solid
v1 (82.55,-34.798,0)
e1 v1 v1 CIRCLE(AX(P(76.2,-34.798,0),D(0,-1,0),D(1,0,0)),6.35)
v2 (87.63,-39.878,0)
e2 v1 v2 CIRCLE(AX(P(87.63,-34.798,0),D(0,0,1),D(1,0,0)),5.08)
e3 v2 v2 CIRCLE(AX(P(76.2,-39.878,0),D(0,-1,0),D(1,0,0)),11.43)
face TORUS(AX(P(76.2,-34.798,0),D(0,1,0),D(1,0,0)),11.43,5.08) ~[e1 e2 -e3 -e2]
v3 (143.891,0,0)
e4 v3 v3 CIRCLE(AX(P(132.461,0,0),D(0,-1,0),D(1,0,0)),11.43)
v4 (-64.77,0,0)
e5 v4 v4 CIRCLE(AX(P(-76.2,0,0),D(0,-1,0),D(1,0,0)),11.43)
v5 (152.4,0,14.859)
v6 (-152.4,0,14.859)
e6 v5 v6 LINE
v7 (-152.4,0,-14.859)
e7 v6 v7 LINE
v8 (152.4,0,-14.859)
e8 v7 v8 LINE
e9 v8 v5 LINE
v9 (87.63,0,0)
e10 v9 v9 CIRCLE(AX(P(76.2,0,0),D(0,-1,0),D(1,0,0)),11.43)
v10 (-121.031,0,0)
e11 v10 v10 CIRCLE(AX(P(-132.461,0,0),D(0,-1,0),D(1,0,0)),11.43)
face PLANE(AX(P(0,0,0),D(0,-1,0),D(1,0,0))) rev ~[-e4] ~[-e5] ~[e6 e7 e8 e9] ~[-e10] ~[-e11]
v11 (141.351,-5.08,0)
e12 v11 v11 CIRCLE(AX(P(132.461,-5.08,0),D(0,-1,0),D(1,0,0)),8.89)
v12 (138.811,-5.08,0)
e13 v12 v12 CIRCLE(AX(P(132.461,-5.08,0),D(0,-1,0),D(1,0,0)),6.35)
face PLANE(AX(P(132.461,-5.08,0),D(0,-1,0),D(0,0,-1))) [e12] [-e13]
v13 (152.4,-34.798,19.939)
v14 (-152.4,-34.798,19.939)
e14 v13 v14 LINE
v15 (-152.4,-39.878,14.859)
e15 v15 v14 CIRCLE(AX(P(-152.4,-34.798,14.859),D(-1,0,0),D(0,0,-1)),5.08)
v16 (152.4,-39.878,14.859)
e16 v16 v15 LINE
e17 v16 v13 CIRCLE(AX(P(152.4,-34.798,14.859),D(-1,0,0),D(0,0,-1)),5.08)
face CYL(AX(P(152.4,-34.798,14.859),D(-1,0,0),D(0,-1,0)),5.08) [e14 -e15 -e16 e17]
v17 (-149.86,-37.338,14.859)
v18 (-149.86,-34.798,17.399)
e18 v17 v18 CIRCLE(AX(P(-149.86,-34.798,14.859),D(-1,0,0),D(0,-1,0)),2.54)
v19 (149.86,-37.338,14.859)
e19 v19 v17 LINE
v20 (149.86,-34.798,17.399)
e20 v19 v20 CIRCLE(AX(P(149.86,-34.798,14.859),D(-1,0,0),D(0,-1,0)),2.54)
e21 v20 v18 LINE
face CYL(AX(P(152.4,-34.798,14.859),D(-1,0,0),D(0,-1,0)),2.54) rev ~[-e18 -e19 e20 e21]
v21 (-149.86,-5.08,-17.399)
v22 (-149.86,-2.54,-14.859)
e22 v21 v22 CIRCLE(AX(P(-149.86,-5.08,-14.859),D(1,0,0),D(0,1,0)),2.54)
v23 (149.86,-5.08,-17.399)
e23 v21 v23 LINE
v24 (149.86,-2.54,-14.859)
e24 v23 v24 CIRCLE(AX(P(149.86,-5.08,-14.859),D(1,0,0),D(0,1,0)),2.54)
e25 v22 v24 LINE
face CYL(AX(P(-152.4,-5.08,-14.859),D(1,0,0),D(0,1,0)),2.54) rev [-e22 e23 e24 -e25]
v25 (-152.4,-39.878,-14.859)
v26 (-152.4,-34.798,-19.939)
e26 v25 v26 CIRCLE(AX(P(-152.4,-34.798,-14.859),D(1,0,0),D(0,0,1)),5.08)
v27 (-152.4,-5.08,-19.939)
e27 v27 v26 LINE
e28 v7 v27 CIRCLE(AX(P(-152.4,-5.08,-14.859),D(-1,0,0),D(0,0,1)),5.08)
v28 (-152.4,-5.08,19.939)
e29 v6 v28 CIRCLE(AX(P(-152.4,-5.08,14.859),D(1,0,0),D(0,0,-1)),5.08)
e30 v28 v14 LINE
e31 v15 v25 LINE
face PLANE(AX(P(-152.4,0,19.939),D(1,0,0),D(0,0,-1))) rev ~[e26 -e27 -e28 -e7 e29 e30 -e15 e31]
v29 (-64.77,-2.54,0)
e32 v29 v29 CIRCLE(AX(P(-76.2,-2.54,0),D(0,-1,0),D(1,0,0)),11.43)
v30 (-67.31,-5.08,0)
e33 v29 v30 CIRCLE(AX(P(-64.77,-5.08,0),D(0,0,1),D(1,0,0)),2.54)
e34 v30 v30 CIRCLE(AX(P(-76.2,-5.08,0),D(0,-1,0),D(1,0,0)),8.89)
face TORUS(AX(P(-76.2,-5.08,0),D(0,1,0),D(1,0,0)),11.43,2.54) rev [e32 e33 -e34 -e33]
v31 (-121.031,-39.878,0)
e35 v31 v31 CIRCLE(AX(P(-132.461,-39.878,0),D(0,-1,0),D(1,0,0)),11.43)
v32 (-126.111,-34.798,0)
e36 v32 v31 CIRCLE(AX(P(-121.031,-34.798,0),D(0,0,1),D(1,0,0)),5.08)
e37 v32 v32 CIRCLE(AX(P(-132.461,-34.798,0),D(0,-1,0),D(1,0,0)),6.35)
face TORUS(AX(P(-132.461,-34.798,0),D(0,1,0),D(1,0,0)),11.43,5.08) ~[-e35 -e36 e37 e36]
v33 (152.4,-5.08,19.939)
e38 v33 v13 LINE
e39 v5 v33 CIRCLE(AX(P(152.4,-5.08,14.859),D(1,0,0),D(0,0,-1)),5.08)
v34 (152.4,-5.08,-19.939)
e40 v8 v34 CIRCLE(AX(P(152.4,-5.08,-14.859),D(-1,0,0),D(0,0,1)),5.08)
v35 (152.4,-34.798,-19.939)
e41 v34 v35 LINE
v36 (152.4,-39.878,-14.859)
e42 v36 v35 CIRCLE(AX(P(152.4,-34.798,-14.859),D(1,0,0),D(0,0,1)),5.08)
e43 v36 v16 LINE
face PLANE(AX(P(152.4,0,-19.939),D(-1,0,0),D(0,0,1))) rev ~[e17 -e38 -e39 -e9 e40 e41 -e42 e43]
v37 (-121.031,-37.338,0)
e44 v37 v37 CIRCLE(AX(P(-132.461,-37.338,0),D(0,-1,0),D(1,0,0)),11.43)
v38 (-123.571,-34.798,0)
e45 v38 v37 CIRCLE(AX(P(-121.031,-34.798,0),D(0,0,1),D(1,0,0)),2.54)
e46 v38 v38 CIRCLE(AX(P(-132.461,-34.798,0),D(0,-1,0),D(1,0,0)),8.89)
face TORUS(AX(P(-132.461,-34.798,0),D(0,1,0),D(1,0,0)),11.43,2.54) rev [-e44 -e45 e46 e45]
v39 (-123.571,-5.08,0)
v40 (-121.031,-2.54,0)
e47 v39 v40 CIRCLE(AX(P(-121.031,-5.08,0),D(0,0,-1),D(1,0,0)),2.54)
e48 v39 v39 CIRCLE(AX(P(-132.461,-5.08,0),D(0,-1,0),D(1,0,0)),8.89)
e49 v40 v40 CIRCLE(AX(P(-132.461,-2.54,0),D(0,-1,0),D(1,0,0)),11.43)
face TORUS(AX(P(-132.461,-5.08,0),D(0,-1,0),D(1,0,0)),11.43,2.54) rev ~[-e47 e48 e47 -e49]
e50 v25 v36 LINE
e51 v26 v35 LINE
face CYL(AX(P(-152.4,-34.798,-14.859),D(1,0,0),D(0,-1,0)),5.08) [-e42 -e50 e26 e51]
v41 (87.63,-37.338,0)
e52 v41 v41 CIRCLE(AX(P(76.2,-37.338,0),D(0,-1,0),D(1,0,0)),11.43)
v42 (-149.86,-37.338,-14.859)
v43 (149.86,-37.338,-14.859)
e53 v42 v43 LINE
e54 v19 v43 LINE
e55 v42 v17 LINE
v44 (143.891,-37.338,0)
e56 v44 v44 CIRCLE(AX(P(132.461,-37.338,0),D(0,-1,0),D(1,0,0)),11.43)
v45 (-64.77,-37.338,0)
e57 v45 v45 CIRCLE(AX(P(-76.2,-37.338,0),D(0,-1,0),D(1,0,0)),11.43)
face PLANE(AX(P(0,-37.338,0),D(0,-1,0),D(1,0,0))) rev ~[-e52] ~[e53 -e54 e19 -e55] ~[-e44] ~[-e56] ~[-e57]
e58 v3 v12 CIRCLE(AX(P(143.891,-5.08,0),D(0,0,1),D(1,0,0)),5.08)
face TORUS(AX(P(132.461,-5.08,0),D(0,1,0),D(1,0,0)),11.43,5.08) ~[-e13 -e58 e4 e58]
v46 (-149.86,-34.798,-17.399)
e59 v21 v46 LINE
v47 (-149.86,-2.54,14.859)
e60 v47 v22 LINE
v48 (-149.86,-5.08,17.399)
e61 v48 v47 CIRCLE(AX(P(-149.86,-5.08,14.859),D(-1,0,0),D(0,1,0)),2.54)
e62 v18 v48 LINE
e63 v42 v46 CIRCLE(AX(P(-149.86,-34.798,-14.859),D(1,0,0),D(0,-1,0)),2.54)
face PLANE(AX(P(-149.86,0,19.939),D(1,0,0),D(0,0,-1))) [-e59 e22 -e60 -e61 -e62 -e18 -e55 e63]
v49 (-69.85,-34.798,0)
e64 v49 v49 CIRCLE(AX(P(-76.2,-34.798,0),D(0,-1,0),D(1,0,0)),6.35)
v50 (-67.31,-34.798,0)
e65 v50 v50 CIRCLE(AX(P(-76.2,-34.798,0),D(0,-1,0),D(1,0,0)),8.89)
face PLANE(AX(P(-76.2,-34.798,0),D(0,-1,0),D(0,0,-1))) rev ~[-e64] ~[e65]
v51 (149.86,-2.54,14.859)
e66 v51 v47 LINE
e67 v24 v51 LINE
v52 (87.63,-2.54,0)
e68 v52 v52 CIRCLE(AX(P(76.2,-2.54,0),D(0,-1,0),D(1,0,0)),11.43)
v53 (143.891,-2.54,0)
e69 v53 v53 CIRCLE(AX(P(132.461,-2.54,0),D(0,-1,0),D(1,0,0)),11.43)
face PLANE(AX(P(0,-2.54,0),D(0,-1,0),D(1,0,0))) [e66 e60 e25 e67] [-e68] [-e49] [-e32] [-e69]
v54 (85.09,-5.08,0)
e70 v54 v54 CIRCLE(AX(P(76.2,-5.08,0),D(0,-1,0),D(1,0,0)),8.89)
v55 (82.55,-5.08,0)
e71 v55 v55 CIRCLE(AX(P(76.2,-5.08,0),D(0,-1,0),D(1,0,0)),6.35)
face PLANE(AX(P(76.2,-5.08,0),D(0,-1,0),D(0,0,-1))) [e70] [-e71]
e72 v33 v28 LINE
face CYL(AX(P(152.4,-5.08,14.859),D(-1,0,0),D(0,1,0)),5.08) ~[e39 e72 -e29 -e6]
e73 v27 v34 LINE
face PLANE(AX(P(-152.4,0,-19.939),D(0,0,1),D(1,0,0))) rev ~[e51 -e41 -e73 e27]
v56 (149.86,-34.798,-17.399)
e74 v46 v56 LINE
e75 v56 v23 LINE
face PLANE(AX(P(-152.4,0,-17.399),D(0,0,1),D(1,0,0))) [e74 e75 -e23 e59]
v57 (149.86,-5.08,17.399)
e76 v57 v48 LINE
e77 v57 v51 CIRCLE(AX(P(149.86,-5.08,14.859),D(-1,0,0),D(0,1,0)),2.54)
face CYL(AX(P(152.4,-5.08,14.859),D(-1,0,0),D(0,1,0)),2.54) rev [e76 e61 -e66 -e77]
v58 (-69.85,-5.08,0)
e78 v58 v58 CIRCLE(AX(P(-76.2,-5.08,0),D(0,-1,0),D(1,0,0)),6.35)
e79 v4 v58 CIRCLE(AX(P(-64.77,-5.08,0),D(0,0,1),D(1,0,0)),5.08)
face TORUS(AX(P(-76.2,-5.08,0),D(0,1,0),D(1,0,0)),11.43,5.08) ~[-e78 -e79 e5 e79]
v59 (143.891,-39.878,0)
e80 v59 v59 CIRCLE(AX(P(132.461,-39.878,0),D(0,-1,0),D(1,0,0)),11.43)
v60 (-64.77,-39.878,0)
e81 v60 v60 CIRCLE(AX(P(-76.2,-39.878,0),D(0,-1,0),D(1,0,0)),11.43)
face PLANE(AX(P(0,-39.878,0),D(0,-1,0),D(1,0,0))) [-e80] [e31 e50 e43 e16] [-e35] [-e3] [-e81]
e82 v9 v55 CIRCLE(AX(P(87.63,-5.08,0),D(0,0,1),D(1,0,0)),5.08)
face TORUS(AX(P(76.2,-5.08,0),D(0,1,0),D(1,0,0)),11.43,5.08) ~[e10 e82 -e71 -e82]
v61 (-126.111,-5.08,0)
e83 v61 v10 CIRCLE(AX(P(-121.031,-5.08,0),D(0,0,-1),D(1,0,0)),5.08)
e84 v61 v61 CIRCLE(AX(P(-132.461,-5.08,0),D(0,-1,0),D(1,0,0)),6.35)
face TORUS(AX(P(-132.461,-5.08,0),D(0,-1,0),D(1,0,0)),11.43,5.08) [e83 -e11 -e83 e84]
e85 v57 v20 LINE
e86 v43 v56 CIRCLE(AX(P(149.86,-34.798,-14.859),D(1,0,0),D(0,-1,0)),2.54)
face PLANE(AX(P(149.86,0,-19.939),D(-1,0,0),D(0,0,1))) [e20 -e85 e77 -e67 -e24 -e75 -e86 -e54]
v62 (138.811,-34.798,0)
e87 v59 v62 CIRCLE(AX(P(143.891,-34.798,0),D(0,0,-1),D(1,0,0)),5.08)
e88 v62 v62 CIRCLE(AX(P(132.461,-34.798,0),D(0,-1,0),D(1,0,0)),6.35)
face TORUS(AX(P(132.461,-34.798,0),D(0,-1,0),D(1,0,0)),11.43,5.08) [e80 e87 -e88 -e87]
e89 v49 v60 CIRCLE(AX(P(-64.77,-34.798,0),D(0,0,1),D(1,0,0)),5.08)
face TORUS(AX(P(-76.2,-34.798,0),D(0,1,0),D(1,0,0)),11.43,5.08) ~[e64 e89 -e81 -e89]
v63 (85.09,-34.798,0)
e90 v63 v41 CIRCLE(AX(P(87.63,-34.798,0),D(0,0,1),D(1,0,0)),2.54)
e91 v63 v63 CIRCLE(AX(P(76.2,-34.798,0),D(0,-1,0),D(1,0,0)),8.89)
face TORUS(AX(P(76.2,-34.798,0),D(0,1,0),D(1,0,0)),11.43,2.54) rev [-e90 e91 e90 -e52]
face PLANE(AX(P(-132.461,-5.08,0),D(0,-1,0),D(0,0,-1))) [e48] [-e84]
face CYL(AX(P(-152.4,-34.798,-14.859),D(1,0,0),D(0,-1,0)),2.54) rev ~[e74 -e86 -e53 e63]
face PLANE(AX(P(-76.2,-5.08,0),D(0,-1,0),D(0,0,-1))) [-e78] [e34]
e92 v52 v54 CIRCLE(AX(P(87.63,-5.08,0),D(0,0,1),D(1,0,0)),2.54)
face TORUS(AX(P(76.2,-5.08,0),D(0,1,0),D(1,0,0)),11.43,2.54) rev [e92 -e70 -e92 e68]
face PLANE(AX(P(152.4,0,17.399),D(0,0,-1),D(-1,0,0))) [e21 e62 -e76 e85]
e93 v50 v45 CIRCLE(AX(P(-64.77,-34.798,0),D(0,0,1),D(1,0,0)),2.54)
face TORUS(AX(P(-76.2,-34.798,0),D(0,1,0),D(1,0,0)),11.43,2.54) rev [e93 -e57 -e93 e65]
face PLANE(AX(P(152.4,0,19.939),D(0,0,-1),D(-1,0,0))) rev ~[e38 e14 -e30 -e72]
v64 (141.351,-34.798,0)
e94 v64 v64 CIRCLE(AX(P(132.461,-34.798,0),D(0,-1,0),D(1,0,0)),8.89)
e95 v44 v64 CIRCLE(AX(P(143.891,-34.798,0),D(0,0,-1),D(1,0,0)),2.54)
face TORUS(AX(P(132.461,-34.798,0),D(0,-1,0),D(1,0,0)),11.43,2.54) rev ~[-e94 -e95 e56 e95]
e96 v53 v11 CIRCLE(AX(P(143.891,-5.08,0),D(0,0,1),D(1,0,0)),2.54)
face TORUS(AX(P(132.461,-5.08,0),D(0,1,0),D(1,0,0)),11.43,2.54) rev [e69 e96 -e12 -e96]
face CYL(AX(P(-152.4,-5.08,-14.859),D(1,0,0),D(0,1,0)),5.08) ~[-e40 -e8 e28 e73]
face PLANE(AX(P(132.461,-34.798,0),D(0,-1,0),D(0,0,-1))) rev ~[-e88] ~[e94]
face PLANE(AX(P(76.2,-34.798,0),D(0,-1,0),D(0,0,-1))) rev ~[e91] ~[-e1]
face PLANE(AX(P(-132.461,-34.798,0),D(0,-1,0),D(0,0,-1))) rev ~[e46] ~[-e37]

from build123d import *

# Parameters (mm, degrees)
F0_R     = 6.35
F1_DEPTH = 39.878
F2_R     = 5.08
F3_R     = 5.08
F4_T     = 2.54


# Not quite as in the source:
# - a shell that OpenCascade refuses in one call is made with other operations: the cavity is built on its own and cut out


with BuildPart() as f1:
    # F0 (on Front) → F1 (new body)
    with BuildSketch(Plane.XZ):
        Polygon((-112.522, -19.939), (152.4, -19.939), (152.4, 19.939), (76.2, 19.939), (0, 19.939), (-76.2, 19.939), (-112.522, 19.939), (-152.4, 19.939), (-152.4, -19.939), align=None)
        with Locations((-132.461, 0)):
            Circle(F0_R, mode=Mode.SUBTRACT)
        with Locations((-76.2, 0)):
            Circle(F0_R, mode=Mode.SUBTRACT)
        with Locations((76.2, 0)):
            Circle(F0_R, mode=Mode.SUBTRACT)
        with Locations((132.461, 0)):
            Circle(F0_R, mode=Mode.SUBTRACT)
    extrude(amount=F1_DEPTH)

    # F2
    f2_edges = [f1.edges().sort_by_distance(p)[0] for p in [
        (-138.811, -39.878, 0),
        (-82.55, -39.878, 0),
        (69.85, -39.878, 0),
    ]]
    fillet(f2_edges, radius=F2_R)

    # F3
    f3_edges = [f1.edges().sort_by_distance(p)[0] for p in [
        (126.111, -39.878, 0),
        (126.111, 0, 0),
        (69.85, 0, 0),
        (-82.55, 0, 0),
        (-138.811, 0, 0),
        (0, 0, -19.939),
        (0, 0, 19.939),
        (0, -39.878, 19.939),
        (0, -39.878, -19.939),
    ]]
    fillet(f3_edges, radius=F3_R)

    # F4: shell of thickness 2.54, made by hand


with BuildPart() as f4_core1:
    # F4_t2: copy of F1
    add(f1.part)

    # the walls: a layer under each face that stays
    f4_faces = [f4_core1.faces().sort_by_distance(p)[0] for p in [
        (0, -39.878, 0),
        (152.4, -19.939, 0),
        (0, -38.3901024484, -18.4511024484),
        (0, -38.3901024484, 18.4511024484),
        (-152.4, -19.939, 0),
        (-140.2988975516, -38.3901024484, 0),
        (-84.0378975516, -38.3901024484, 0),
        (68.3621024484, -38.3901024484, 0),
        (124.6231024484, -38.3901024484, 0),
        (0, -19.939, -19.939),
        (0, -1.4878975516, -18.4511024484),
        (0, 0, 0),
        (0, -1.4878975516, 18.4511024484),
        (0, -19.939, 19.939),
        (124.6231024484, -1.4878975516, 0),
        (68.3621024484, -1.4878975516, 0),
        (-84.0378975516, -1.4878975516, 0),
        (-140.2988975516, -1.4878975516, 0),
    ]]
    thicken(f4_faces, amount=-F4_T, mode=Mode.SUBTRACT)


with BuildPart() as f1_1:
    add(f1.part)

    # what is left inside the walls is the cavity
    f4_cavity = [f4_core1.part.solids().sort_by_distance(p)[0] for p in [
        (0, -24.892, -17.3736),
    ]]
    add(f4_cavity, mode=Mode.SUBTRACT)


solid = f1_1.part
